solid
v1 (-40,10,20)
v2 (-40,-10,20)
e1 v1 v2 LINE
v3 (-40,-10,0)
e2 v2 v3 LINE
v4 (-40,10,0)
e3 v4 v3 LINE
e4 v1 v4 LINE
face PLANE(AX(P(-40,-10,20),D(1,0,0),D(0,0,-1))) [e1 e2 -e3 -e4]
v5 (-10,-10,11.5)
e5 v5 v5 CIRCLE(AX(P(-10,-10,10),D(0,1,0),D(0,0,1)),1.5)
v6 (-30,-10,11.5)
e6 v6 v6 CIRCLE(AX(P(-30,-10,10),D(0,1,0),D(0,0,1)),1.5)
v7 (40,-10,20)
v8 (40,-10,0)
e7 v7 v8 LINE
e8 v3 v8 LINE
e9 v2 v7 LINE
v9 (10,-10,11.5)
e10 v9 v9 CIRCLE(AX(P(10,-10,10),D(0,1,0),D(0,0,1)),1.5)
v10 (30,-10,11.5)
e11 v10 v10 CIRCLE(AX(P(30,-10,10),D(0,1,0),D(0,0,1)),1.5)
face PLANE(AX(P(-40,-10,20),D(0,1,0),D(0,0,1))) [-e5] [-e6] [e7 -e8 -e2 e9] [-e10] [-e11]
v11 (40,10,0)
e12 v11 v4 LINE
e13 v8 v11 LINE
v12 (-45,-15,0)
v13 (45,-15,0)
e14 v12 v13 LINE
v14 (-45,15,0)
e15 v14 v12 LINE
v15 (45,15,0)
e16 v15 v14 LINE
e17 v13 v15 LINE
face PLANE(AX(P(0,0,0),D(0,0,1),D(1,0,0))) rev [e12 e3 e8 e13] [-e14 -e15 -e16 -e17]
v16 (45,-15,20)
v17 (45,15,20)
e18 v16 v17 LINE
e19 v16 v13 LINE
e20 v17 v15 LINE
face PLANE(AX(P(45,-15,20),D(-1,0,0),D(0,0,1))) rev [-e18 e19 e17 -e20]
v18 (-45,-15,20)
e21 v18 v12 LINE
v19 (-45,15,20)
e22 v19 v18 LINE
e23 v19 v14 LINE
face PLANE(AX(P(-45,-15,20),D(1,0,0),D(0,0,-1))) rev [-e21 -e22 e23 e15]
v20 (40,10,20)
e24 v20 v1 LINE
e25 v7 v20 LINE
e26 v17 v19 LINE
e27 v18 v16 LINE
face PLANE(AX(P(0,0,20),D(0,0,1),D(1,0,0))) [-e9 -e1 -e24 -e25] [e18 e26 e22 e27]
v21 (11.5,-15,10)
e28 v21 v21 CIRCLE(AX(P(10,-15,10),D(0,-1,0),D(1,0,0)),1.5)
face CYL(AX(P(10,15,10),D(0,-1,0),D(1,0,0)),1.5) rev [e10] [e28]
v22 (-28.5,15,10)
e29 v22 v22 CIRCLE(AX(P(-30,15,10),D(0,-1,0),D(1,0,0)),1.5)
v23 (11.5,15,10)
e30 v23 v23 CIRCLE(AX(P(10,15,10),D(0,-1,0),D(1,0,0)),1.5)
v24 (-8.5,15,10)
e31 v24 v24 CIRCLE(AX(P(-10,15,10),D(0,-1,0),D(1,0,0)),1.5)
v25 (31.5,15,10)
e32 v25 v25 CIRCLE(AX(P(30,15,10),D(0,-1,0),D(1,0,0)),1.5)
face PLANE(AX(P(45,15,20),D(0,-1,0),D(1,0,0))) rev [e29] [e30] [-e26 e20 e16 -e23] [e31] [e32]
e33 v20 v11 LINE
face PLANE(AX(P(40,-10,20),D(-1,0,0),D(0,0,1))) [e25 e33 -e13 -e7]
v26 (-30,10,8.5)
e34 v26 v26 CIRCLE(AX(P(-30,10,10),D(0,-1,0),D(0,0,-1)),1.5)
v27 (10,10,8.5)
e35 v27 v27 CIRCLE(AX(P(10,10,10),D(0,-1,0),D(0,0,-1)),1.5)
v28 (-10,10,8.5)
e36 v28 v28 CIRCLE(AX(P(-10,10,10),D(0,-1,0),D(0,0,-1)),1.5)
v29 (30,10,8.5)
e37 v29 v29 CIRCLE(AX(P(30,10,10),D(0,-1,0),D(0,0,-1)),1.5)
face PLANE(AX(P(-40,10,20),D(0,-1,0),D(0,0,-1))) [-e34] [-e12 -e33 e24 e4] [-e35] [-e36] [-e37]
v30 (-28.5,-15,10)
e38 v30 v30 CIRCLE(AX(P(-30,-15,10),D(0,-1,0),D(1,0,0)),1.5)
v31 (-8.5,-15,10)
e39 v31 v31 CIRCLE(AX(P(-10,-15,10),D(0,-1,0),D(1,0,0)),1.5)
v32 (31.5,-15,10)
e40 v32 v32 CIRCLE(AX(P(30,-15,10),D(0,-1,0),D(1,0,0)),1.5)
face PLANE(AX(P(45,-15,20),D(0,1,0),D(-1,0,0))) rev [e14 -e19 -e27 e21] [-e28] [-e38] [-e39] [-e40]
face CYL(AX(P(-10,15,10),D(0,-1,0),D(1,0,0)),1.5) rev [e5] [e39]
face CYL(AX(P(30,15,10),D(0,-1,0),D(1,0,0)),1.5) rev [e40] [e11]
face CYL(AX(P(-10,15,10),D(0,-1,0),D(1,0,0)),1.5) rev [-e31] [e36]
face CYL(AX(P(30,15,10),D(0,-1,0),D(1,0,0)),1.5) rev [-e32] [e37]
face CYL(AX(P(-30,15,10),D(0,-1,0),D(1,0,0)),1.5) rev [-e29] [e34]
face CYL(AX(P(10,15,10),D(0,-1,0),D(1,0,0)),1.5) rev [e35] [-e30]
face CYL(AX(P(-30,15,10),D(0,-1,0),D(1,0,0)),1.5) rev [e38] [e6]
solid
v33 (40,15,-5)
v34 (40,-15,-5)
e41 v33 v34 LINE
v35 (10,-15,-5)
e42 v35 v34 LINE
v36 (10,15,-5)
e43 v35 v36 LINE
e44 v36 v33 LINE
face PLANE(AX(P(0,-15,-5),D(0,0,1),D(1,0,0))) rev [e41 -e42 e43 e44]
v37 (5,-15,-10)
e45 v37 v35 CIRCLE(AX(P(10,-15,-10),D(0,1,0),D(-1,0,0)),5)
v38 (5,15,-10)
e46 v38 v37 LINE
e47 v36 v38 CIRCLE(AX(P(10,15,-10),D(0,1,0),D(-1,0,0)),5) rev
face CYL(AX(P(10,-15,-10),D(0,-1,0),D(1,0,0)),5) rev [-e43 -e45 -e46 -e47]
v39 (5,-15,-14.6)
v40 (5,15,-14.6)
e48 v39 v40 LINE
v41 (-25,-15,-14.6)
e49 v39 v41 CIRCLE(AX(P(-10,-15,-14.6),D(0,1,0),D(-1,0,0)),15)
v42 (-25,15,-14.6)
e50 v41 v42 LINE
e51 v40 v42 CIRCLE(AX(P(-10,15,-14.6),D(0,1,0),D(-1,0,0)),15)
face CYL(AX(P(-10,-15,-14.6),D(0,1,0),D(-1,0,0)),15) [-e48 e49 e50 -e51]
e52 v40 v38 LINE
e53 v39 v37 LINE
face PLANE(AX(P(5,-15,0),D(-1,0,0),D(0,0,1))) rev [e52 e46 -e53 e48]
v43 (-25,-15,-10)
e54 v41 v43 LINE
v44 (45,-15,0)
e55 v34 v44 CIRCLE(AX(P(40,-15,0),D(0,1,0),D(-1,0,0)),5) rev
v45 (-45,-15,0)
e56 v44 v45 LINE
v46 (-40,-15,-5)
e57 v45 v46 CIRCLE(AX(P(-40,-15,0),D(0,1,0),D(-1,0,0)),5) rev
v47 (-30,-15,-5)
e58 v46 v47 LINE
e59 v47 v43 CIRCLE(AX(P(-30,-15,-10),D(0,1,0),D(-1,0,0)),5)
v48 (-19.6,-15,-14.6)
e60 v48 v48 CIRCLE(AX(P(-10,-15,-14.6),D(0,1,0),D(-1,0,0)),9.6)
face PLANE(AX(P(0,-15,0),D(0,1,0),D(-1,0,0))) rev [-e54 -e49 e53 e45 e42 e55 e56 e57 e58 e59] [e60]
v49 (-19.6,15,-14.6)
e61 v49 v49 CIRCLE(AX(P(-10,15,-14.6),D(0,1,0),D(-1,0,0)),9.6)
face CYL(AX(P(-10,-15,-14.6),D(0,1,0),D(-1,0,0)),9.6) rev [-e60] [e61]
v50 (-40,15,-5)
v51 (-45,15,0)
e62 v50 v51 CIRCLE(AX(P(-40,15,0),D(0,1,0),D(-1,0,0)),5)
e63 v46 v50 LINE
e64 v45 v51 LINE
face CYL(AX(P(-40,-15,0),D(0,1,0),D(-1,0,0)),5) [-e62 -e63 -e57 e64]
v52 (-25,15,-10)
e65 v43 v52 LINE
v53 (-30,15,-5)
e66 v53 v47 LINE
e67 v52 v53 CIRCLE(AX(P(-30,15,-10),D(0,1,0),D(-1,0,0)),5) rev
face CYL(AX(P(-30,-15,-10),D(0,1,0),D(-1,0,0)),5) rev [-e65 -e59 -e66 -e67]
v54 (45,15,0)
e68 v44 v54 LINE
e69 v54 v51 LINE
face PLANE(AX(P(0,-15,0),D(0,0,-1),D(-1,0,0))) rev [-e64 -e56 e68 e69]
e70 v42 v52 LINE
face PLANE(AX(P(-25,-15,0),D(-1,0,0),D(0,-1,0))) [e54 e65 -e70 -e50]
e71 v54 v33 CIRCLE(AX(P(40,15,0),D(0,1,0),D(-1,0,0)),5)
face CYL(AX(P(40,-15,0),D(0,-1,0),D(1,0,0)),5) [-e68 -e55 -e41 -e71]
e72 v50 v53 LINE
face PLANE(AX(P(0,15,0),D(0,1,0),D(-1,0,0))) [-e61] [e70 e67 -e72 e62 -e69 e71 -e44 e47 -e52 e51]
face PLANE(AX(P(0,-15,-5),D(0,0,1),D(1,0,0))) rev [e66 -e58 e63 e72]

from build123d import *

# Parameters (mm, degrees)
ESQUISSE1_W             = 90
ESQUISSE1_H             = 30
ESQUISSE1_W_2           = 80
ESQUISSE1_H_2           = 20
BOSS_EXTRU_1_DEPTH      = 20
ENL_V_MAT_EXTRU_1_DEPTH = 30
ESQUISSE2_R             = 9.6
BOSS_EXTRU_3_DEPTH      = 30
CONG_1_R                = 5
CONG_2_R                = 5


with BuildPart() as part:
    # Esquisse1 → Boss.-Extru.1 (new body)
    with BuildSketch(Plane.XY):
        Rectangle(ESQUISSE1_W, ESQUISSE1_H)
        Rectangle(ESQUISSE1_W_2, ESQUISSE1_H_2, mode=Mode.SUBTRACT)
    extrude(amount=BOSS_EXTRU_1_DEPTH)

    # Esquisse3 → Enlèv. mat.-Extru.1 (cut)
    with BuildSketch(Plane.XZ.offset(15)):
        with BuildLine():
            ThreePointArc((28.5, 10), (30, 8.5), (31.5, 10))
            Line((31.5, 10), (28.5, 10))
        make_face()
        with BuildLine():
            Line((28.5, 10), (31.5, 10))
            ThreePointArc((31.5, 10), (30, 11.5), (28.5, 10))
        make_face()
        with BuildLine():
            ThreePointArc((8.5, 10), (10, 8.5), (11.5, 10))
            Line((11.5, 10), (8.5, 10))
        make_face()
        with BuildLine():
            Line((8.5, 10), (11.5, 10))
            ThreePointArc((11.5, 10), (10, 11.5), (8.5, 10))
        make_face()
        with BuildLine():
            ThreePointArc((-8.5, 10), (-10, 11.5), (-11.5, 10))
            Line((-11.5, 10), (-8.5, 10))
        make_face()
        with BuildLine():
            Line((-8.5, 10), (-11.5, 10))
            ThreePointArc((-11.5, 10), (-10, 8.5), (-8.5, 10))
        make_face()
        with BuildLine():
            ThreePointArc((-28.5, 10), (-30, 11.5), (-31.5, 10))
            Line((-31.5, 10), (-28.5, 10))
        make_face()
        with BuildLine():
            Line((-28.5, 10), (-31.5, 10))
            ThreePointArc((-31.5, 10), (-30, 8.5), (-28.5, 10))
        make_face()
    extrude(amount=-ENL_V_MAT_EXTRU_1_DEPTH, mode=Mode.SUBTRACT)


with BuildPart() as body_2:
    # Esquisse2 → Boss.-Extru.3 (new body)
    with BuildSketch(Plane(origin=(0, 15, 0), x_dir=(1, 0, 0), z_dir=(0, 1, 0))):
        with BuildLine():
            Line((-45, 5), (-45, 0))
            Line((-45, 0), (45, 0))
            Line((45, 0), (45, 5))
            Line((45, 5), (5, 5))
            Line((5, 5), (5, 14.6))
            ThreePointArc((5, 14.6), (-10, 29.6), (-25, 14.6))
            Line((-25, 14.6), (-25, 5))
            Line((-25, 5), (-45, 5))
        make_face()
        with Locations(Location((-10, 14.6, 0), (0, 0, 180))):
            Circle(ESQUISSE2_R, mode=Mode.SUBTRACT)
    extrude(amount=-BOSS_EXTRU_3_DEPTH)

    # Congé1
    cong_1_edges = [body_2.edges().sort_by_distance(p)[0] for p in [
        (-25, 0, -5),
        (5, 0, -5),
    ]]
    fillet(cong_1_edges, radius=CONG_1_R)

    # Congé2
    cong_2_edges = [body_2.edges().sort_by_distance(p)[0] for p in [
        (-45, 0, -5),
        (45, 0, -5),
    ]]
    fillet(cong_2_edges, radius=CONG_2_R - 0.0001)  # a hair under: the kernel refuses the full size


solid = Compound([part.part, body_2.part])
